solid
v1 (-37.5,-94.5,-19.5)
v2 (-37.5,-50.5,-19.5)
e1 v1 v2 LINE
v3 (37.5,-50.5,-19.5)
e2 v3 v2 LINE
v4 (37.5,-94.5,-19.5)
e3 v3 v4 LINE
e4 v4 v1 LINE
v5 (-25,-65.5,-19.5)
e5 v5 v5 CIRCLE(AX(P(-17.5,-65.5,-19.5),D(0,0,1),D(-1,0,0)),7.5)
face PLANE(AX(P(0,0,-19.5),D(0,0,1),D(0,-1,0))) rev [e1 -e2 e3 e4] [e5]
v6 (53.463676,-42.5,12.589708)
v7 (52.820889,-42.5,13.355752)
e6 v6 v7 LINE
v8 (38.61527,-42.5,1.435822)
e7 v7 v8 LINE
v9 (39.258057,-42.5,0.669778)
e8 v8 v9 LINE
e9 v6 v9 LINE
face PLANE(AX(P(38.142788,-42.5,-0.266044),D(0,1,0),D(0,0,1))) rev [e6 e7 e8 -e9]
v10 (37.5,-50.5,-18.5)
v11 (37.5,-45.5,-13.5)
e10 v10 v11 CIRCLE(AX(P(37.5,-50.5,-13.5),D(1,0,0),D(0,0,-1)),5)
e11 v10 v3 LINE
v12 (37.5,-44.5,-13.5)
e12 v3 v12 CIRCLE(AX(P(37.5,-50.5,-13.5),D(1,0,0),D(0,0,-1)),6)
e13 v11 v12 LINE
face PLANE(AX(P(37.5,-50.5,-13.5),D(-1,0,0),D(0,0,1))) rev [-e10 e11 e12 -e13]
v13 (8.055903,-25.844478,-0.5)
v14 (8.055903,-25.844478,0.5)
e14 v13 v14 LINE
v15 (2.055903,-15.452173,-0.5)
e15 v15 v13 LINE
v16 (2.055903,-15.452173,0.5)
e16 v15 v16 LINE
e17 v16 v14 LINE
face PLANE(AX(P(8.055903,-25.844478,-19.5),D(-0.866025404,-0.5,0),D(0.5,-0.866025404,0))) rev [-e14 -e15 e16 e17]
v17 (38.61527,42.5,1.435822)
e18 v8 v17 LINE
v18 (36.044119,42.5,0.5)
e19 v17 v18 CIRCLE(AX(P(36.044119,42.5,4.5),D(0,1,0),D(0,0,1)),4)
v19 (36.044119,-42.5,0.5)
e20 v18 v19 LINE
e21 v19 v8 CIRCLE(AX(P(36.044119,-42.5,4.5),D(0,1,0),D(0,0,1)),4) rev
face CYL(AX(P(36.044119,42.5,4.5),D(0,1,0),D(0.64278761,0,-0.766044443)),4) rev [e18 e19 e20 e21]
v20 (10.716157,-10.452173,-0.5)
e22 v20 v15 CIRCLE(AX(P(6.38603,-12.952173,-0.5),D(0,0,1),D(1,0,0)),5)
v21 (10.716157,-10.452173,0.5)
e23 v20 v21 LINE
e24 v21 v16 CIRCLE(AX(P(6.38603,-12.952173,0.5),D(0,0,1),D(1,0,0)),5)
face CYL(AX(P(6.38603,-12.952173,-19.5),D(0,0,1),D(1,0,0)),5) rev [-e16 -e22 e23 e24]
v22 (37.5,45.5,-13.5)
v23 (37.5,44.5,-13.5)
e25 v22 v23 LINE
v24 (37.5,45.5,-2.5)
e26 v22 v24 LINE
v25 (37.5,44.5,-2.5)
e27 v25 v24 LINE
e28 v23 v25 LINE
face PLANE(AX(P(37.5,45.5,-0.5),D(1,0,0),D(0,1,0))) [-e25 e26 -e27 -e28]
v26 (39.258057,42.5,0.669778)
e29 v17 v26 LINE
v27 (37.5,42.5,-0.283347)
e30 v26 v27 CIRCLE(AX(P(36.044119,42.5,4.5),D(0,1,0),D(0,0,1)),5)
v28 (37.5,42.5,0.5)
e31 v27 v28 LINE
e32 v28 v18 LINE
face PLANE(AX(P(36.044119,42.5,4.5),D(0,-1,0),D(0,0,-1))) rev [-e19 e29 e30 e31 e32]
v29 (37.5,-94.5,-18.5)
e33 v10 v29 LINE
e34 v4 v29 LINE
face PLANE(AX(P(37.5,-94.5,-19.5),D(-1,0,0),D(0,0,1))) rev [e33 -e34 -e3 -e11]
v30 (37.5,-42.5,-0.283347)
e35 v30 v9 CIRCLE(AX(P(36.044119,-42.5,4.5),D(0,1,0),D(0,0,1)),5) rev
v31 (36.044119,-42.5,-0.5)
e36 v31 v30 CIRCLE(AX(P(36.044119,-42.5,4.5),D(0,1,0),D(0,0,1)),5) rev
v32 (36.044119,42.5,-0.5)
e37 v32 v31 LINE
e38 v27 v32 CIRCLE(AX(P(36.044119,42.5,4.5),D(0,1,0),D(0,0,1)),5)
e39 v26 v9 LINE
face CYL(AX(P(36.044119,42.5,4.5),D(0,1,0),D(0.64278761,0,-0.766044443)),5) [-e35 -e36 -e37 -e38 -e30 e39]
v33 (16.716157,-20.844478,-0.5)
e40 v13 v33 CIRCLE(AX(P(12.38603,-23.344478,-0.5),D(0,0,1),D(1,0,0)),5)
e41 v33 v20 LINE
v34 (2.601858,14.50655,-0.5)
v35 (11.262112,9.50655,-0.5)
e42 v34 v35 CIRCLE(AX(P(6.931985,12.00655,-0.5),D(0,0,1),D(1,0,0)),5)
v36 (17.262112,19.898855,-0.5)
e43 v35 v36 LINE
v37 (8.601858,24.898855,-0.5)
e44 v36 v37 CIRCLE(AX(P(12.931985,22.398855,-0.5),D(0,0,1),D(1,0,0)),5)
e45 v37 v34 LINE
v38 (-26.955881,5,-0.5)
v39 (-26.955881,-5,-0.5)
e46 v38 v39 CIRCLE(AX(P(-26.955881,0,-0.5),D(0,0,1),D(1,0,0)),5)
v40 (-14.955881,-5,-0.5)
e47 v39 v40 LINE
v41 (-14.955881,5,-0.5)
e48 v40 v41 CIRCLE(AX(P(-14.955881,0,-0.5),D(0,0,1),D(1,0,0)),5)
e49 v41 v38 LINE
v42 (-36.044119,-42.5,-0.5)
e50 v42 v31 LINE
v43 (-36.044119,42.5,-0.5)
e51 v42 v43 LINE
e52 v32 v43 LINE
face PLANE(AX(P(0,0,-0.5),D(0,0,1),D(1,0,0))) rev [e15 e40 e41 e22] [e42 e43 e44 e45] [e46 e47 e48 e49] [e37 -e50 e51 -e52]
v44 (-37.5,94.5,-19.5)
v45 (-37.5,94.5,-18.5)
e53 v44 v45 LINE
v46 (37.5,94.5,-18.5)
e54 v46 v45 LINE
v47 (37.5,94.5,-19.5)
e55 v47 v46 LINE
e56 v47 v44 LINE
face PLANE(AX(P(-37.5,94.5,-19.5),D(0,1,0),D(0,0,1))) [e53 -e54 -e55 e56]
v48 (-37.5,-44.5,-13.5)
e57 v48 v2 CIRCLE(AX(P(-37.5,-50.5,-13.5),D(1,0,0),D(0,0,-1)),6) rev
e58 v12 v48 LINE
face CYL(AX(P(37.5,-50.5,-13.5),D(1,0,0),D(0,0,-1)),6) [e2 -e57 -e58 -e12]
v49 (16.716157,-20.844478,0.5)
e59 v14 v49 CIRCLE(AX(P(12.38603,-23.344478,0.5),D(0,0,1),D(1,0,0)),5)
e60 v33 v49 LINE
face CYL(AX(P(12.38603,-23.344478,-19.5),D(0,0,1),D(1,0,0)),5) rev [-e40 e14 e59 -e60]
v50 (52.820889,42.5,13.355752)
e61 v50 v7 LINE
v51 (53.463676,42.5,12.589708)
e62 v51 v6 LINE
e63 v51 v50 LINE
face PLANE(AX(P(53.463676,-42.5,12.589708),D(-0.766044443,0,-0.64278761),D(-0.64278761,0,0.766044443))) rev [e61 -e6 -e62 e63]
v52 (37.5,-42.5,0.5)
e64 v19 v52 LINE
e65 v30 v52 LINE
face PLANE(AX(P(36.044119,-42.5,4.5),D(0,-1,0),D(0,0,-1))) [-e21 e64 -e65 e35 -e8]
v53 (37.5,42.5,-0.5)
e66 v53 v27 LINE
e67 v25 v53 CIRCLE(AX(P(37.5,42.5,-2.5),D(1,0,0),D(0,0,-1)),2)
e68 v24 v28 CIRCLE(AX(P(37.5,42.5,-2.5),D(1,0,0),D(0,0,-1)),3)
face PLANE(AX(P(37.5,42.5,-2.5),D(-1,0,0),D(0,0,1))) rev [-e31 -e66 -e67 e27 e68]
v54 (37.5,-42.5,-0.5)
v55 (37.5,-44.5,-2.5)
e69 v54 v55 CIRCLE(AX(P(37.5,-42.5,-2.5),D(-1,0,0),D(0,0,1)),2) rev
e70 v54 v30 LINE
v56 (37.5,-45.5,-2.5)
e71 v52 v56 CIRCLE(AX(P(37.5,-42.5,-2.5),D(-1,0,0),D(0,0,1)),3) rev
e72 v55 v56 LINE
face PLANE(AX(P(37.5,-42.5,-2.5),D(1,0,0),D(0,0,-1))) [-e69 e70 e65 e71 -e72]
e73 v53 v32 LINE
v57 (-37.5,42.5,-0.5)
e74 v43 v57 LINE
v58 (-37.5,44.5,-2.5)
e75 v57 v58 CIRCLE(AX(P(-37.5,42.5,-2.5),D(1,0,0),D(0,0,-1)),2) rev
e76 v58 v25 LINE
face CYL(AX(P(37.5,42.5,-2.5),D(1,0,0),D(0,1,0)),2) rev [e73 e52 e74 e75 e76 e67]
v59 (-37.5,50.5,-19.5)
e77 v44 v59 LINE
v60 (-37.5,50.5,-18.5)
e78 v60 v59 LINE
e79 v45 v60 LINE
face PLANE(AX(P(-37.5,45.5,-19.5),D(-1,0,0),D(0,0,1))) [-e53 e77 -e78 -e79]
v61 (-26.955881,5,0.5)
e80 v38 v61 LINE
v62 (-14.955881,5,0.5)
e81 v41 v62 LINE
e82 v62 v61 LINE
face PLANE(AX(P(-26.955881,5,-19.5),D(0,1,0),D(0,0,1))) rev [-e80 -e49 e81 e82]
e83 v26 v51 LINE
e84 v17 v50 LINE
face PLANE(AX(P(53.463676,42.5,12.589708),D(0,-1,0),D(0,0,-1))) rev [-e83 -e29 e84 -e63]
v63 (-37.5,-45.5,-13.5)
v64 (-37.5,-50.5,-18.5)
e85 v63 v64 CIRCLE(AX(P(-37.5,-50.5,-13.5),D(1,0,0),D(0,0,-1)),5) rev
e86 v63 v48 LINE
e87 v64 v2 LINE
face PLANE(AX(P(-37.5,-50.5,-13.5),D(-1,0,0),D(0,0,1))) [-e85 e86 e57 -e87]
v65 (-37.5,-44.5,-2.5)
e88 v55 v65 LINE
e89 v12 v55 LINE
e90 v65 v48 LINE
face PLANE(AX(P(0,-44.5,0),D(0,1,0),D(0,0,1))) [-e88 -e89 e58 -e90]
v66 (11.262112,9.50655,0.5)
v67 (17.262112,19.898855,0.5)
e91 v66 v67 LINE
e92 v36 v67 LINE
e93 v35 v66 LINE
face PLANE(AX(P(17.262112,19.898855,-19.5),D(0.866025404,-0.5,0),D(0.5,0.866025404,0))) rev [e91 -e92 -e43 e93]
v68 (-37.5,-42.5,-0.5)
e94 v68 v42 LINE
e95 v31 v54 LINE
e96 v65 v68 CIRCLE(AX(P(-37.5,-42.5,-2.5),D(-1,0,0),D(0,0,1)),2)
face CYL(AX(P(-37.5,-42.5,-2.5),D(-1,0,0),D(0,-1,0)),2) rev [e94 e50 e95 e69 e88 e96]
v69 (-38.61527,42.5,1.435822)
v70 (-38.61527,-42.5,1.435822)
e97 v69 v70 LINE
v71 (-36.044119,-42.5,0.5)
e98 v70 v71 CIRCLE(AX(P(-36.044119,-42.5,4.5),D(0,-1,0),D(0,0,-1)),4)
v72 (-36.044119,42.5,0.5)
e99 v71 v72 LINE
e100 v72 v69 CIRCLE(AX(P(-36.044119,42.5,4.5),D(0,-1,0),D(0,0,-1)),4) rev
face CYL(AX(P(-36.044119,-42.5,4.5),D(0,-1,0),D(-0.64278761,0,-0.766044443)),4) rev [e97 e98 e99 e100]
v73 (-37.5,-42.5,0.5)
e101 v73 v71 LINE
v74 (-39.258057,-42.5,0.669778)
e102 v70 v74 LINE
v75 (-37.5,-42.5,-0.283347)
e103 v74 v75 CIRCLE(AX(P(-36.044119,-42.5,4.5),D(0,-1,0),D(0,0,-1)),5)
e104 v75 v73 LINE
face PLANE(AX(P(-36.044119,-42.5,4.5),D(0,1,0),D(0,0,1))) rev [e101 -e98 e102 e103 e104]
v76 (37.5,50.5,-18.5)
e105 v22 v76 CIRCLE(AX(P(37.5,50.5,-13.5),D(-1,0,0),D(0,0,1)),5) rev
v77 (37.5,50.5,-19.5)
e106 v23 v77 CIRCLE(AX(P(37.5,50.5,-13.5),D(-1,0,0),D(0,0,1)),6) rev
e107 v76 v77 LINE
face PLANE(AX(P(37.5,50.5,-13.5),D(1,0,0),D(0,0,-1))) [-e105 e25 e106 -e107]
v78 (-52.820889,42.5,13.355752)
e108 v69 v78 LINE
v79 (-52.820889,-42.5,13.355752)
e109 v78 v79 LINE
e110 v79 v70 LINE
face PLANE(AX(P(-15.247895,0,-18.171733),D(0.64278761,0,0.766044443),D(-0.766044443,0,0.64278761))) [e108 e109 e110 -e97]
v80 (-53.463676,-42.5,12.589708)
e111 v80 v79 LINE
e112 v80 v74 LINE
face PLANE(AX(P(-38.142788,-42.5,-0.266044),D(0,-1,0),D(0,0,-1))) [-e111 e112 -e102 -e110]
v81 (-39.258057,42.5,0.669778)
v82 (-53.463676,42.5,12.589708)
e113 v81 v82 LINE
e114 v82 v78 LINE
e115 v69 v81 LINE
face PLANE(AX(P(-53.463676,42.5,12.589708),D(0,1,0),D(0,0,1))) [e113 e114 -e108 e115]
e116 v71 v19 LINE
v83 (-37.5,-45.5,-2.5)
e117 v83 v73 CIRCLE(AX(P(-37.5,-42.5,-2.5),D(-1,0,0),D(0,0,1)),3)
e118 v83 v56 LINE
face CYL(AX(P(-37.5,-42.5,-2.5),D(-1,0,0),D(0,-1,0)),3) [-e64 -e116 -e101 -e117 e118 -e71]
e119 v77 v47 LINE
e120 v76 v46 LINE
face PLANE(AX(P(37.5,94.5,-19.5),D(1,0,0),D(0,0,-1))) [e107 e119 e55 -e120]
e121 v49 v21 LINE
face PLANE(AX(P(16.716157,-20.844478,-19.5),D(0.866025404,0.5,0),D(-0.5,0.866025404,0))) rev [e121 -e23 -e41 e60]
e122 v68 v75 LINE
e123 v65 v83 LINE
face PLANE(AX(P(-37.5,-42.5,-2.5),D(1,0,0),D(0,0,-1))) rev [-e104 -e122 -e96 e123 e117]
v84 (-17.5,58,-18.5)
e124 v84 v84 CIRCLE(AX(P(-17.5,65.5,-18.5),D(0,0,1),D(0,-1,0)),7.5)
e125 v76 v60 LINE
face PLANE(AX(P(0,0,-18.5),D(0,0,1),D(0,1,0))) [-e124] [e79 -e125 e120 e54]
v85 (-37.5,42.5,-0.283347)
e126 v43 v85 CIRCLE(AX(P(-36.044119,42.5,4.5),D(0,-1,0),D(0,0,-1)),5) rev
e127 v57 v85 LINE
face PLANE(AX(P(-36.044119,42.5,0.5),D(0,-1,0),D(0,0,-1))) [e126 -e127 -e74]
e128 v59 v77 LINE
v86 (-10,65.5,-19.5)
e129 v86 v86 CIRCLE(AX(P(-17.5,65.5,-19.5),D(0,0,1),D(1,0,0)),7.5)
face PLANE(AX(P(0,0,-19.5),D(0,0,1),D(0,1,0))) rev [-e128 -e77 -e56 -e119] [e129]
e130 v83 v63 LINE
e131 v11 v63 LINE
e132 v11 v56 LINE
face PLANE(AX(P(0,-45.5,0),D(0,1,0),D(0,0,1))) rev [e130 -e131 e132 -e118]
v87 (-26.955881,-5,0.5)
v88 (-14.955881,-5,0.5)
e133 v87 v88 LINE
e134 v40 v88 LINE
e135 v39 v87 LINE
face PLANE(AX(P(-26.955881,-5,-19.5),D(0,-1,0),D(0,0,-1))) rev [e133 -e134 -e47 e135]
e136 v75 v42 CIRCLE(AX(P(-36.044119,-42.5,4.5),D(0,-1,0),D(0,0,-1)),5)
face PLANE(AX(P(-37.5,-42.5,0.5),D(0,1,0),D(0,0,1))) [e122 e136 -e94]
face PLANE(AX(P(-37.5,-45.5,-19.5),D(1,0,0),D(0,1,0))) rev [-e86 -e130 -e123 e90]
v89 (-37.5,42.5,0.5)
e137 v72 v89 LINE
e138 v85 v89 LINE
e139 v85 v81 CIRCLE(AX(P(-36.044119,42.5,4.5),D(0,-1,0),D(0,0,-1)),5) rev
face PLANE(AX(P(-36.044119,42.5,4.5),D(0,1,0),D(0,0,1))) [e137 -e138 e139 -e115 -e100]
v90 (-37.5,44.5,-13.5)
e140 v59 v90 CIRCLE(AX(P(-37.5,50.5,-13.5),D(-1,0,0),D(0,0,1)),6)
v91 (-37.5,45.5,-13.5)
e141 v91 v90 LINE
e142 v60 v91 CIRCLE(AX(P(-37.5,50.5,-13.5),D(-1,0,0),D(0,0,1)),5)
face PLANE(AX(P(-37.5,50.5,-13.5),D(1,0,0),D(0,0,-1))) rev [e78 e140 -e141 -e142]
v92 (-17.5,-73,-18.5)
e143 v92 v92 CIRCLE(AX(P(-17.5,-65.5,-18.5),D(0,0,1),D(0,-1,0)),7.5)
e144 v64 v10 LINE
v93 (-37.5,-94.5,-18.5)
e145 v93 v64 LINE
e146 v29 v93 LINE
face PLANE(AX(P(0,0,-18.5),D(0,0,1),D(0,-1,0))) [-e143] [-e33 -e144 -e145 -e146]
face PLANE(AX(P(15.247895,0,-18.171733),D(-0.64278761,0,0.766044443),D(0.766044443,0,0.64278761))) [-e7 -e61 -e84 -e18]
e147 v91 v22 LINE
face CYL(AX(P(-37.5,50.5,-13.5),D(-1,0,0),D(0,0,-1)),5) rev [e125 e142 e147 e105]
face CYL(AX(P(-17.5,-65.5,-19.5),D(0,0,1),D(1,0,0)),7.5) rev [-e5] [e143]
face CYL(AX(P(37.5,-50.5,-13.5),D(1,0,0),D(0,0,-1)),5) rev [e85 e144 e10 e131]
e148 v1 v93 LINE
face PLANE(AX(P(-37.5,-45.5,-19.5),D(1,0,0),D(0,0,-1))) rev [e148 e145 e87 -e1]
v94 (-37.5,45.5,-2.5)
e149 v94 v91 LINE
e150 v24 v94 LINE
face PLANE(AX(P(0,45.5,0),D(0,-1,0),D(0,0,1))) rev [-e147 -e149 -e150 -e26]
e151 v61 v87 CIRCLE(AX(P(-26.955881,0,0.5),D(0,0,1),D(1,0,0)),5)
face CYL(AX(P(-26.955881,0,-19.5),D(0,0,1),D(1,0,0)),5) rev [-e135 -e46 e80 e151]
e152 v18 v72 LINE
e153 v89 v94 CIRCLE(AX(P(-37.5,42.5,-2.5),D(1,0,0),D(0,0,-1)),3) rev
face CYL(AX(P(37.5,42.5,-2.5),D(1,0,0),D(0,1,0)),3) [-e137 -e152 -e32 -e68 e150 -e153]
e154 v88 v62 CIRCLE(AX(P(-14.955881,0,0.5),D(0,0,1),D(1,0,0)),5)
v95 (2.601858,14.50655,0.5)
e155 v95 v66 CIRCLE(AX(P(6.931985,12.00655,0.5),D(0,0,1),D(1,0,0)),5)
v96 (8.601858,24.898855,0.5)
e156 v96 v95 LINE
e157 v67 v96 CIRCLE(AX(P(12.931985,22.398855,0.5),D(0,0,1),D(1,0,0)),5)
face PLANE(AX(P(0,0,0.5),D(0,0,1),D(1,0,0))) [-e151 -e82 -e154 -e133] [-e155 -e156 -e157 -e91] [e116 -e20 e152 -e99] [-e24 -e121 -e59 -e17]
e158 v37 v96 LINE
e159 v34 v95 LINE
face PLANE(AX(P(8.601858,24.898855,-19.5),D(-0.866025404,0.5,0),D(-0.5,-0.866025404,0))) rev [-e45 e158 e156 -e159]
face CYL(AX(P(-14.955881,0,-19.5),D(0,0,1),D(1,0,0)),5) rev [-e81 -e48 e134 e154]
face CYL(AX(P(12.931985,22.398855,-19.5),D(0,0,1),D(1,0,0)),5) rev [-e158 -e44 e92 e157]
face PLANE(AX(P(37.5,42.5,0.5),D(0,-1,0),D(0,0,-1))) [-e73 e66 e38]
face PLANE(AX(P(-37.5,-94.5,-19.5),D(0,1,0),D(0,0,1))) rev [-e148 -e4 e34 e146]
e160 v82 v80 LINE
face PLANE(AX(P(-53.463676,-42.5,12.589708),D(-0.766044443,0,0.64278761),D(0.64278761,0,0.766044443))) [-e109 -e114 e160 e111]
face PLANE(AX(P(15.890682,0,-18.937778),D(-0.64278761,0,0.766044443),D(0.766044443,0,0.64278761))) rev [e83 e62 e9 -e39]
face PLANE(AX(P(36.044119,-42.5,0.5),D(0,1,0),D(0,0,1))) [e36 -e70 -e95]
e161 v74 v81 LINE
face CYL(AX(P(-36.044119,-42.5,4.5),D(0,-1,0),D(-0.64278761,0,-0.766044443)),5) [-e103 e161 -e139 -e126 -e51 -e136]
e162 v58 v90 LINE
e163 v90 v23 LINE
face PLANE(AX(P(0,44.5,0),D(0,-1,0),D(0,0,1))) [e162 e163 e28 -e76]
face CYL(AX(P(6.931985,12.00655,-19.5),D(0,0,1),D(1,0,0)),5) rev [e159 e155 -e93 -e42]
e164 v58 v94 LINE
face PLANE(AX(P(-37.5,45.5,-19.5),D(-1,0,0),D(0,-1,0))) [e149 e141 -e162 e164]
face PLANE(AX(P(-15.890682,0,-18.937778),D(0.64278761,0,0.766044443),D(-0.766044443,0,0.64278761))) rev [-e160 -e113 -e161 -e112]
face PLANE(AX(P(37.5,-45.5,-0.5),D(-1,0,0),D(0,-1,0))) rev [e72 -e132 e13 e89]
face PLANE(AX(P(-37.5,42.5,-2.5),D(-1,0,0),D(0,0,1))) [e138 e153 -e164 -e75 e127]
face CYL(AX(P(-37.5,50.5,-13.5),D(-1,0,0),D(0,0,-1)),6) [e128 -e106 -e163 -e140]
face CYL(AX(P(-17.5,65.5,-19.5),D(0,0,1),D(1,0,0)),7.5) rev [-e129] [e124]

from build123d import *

# Parameters (mm, degrees)
BASE_FLANGE1_START           = -0.5
BASE_FLANGE1_OUTLINE_W       = 91
BASE_FLANGE1_OUTLINE_H       = 75
BASE_FLANGE1_DEPTH           = 1
EDGE_FLANGE1_STRIP_W         = 8
EDGE_FLANGE1_STRIP_H         = 1
EDGE_FLANGE1_STRIP_CUT_DEPTH = 75
EDGE_FLANGE1_DEPTH           = 75
EDGE_FLANGE2_STRIP_W         = 14
EDGE_FLANGE2_STRIP_H         = 1
EDGE_FLANGE2_STRIP_CUT_DEPTH = 75
EDGE_FLANGE2_DEPTH           = 75
EDGE_FLANGE3_START           = -42.5
EDGE_FLANGE3_DEPTH           = 85
EDGE_FLANGE3_2_DEPTH         = 85
CUT_EXTRUDE1_DEPTH           = 111.402059319
CUT_EXTRUDE1_DEPTH_BACK      = 111.402059319
CUT_EXTRUDE2_DEPTH           = 114.152126139
CUT_EXTRUDE2_DEPTH_BACK      = 114.152126139
SKETCH16_R                   = 7.5


# Read off the part's stored shape, not the designer's step: Base-Flange1, Edge-Flange3
# Sheet-metal steps are written as plain solids
with BuildPart() as part:
    # Base-Flange1 outline → Base-Flange1 (new body)
    with BuildSketch(Plane(origin=(0, 0, 0), x_dir=(0, 1, 0), z_dir=(0, 0, 1)).offset(BASE_FLANGE1_START)):
        Rectangle(BASE_FLANGE1_OUTLINE_W, BASE_FLANGE1_OUTLINE_H)
    extrude(amount=BASE_FLANGE1_DEPTH)

    # Edge-Flange1 strip (across the edge) → Edge-Flange1 strip cut (cut)
    with BuildSketch(Plane(origin=(37.5, -45.5, -0.5), x_dir=(0, 1, 0), z_dir=(-1, 0, 0))):
        with Locations((-1, -0.5)):
            Rectangle(EDGE_FLANGE1_STRIP_W, EDGE_FLANGE1_STRIP_H)
    edge_flange1_strip_cut = extrude(amount=EDGE_FLANGE1_STRIP_CUT_DEPTH, mode=Mode.SUBTRACT)

    # Edge-Flange1 section (across the edge) → Edge-Flange1 (add)
    with BuildSketch(Plane(origin=(37.5, -45.5, -0.5), x_dir=(0, 1, 0), z_dir=(-1, 0, 0))):
        with BuildLine():
            Line((0, 2), (0, 19))
            Line((0, 19), (1, 19))
            Line((1, 19), (1, 2))
            ThreePointArc((1, 2), (1.585786438, 0.585786438), (3, 0))
            Line((3, 0), (3, -1))
            ThreePointArc((3, -1), (0.878679656, -0.121320344), (0, 2))
        make_face()
    edge_flange1 = extrude(amount=EDGE_FLANGE1_DEPTH)

    # Edge-Flange2 strip (across the edge) → Edge-Flange2 strip cut (cut)
    with BuildSketch(Plane(origin=(-37.5, -45.5, -19.5), x_dir=(0, 0, 1), z_dir=(1, 0, 0))):
        with Locations((-1, -0.5)):
            Rectangle(EDGE_FLANGE2_STRIP_W, EDGE_FLANGE2_STRIP_H)
    edge_flange2_strip_cut = extrude(amount=EDGE_FLANGE2_STRIP_CUT_DEPTH, mode=Mode.SUBTRACT)

    # Edge-Flange2 section (across the edge) → Edge-Flange2 (add)
    with BuildSketch(Plane(origin=(-37.5, -45.5, -19.5), x_dir=(0, 0, 1), z_dir=(1, 0, 0))):
        with BuildLine():
            Line((0, 5), (0, 49))
            Line((0, 49), (1, 49))
            Line((1, 49), (1, 5))
            ThreePointArc((1, 5), (2.464466094, 1.464466094), (6, 0))
            Line((6, 0), (6, -1))
            ThreePointArc((6, -1), (1.757359313, 0.757359313), (0, 5))
        make_face()
    edge_flange2 = extrude(amount=EDGE_FLANGE2_DEPTH)

    # Mirror1: Edge-Flange1 strip cut, Edge-Flange1, Edge-Flange2 strip cut, Edge-Flange2 across plane
    add(edge_flange1_strip_cut.mirror(Plane.ZX), mode=Mode.SUBTRACT)
    add(edge_flange1.mirror(Plane.ZX))
    add(edge_flange2_strip_cut.mirror(Plane.ZX), mode=Mode.SUBTRACT)
    add(edge_flange2.mirror(Plane.ZX))

    # Edge-Flange3 outline → Edge-Flange3 (cut)
    with BuildSketch(Plane(origin=(0, 0, 0), x_dir=(1, 0, 0), z_dir=(0, 1, 0)).offset(EDGE_FLANGE3_START)):
        with BuildLine():
            ThreePointArc((36.044119063, 0.5), (36.780075537, 0.44554022), (37.5, 0.283347228))
            Line((37.5, 0.283347228), (37.5, 0.5))
            Line((37.5, 0.5), (36.044119063, 0.5))
        make_face()
    edge_flange3 = extrude(amount=EDGE_FLANGE3_DEPTH, mode=Mode.SUBTRACT)

    # Edge-Flange3 2 outline → Edge-Flange3 2 (add)
    with BuildSketch(Plane(origin=(0, 0, 0), x_dir=(1, 0, 0), z_dir=(0, 1, 0)).offset(EDGE_FLANGE3_START)):
        with BuildLine():
            Line((53.463676472, -12.589707751), (39.258057111, -0.669777784))
            ThreePointArc((39.258057111, -0.669777784), (38.427166306, -0.104424288), (37.5, 0.283347228))
            Line((37.5, 0.283347228), (37.5, -0.5))
            Line((37.5, -0.5), (36.044119063, -0.5))
            ThreePointArc((36.044119063, -0.5), (37.412199636, -0.741229517), (38.615269502, -1.435822228))
            Line((38.615269502, -1.435822228), (52.820888862, -13.355752194))
            Line((52.820888862, -13.355752194), (53.463676472, -12.589707751))
        make_face()
    edge_flange3_2 = extrude(amount=EDGE_FLANGE3_2_DEPTH)

    # Mirror2: Edge-Flange3, Edge-Flange3 2 across plane
    add(edge_flange3.mirror(Plane(origin=(0, 0, 0), x_dir=(0, 0, 1), z_dir=(1, 0, 0))), mode=Mode.SUBTRACT)
    add(edge_flange3_2.mirror(Plane(origin=(0, 0, 0), x_dir=(0, 0, 1), z_dir=(1, 0, 0))))

    # Sketch15 → Cut-Extrude1 (cut, two sides: drawn at the far end of the back side and taken through both)
    with BuildSketch(Plane.XY.offset(0.5).offset(-CUT_EXTRUDE1_DEPTH_BACK)):
        with BuildLine():
            Line((-26.955880937, 5), (-14.955880937, 5))
            ThreePointArc((-14.955880937, 5), (-9.955880937, 0), (-14.955880937, -5))
            Line((-14.955880937, -5), (-26.955880937, -5))
            ThreePointArc((-26.955880937, -5), (-31.955880937, 0), (-26.955880937, 5))
        make_face()
        with BuildLine():
            Line((17.262112136, 19.898855266), (11.262112136, 9.50655042))
            ThreePointArc((11.262112136, 9.50655042), (4.431985117, 7.676423401), (2.601858098, 14.50655042))
            Line((2.601858098, 14.50655042), (8.601858098, 24.898855266))
            ThreePointArc((8.601858098, 24.898855266), (15.431985117, 26.728982285), (17.262112136, 19.898855266))
        make_face()
        with BuildLine():
            Line((8.055902747, -25.844477673), (2.055902747, -15.452172827))
            ThreePointArc((2.055902747, -15.452172827), (3.886029766, -8.622045809), (10.716156785, -10.452172827))
            Line((10.716156785, -10.452172827), (16.716156785, -20.844477673))
            ThreePointArc((16.716156785, -20.844477673), (14.886029766, -27.674604692), (8.055902747, -25.844477673))
        make_face()
    extrude(amount=CUT_EXTRUDE1_DEPTH + CUT_EXTRUDE1_DEPTH_BACK, mode=Mode.SUBTRACT)

    # Sketch16 → Cut-Extrude2 (cut, two sides: drawn at the far end of the back side and taken through both)
    with BuildSketch(Plane.XY.offset(-18.5).offset(-CUT_EXTRUDE2_DEPTH_BACK)):
        with Locations((-17.5, 65.5)):
            Circle(SKETCH16_R)
        with Locations(Location((-17.5, -65.5, 0), (0, 0, 270))):
            Circle(SKETCH16_R)
    extrude(amount=CUT_EXTRUDE2_DEPTH + CUT_EXTRUDE2_DEPTH_BACK, mode=Mode.SUBTRACT)


solid = part.part
